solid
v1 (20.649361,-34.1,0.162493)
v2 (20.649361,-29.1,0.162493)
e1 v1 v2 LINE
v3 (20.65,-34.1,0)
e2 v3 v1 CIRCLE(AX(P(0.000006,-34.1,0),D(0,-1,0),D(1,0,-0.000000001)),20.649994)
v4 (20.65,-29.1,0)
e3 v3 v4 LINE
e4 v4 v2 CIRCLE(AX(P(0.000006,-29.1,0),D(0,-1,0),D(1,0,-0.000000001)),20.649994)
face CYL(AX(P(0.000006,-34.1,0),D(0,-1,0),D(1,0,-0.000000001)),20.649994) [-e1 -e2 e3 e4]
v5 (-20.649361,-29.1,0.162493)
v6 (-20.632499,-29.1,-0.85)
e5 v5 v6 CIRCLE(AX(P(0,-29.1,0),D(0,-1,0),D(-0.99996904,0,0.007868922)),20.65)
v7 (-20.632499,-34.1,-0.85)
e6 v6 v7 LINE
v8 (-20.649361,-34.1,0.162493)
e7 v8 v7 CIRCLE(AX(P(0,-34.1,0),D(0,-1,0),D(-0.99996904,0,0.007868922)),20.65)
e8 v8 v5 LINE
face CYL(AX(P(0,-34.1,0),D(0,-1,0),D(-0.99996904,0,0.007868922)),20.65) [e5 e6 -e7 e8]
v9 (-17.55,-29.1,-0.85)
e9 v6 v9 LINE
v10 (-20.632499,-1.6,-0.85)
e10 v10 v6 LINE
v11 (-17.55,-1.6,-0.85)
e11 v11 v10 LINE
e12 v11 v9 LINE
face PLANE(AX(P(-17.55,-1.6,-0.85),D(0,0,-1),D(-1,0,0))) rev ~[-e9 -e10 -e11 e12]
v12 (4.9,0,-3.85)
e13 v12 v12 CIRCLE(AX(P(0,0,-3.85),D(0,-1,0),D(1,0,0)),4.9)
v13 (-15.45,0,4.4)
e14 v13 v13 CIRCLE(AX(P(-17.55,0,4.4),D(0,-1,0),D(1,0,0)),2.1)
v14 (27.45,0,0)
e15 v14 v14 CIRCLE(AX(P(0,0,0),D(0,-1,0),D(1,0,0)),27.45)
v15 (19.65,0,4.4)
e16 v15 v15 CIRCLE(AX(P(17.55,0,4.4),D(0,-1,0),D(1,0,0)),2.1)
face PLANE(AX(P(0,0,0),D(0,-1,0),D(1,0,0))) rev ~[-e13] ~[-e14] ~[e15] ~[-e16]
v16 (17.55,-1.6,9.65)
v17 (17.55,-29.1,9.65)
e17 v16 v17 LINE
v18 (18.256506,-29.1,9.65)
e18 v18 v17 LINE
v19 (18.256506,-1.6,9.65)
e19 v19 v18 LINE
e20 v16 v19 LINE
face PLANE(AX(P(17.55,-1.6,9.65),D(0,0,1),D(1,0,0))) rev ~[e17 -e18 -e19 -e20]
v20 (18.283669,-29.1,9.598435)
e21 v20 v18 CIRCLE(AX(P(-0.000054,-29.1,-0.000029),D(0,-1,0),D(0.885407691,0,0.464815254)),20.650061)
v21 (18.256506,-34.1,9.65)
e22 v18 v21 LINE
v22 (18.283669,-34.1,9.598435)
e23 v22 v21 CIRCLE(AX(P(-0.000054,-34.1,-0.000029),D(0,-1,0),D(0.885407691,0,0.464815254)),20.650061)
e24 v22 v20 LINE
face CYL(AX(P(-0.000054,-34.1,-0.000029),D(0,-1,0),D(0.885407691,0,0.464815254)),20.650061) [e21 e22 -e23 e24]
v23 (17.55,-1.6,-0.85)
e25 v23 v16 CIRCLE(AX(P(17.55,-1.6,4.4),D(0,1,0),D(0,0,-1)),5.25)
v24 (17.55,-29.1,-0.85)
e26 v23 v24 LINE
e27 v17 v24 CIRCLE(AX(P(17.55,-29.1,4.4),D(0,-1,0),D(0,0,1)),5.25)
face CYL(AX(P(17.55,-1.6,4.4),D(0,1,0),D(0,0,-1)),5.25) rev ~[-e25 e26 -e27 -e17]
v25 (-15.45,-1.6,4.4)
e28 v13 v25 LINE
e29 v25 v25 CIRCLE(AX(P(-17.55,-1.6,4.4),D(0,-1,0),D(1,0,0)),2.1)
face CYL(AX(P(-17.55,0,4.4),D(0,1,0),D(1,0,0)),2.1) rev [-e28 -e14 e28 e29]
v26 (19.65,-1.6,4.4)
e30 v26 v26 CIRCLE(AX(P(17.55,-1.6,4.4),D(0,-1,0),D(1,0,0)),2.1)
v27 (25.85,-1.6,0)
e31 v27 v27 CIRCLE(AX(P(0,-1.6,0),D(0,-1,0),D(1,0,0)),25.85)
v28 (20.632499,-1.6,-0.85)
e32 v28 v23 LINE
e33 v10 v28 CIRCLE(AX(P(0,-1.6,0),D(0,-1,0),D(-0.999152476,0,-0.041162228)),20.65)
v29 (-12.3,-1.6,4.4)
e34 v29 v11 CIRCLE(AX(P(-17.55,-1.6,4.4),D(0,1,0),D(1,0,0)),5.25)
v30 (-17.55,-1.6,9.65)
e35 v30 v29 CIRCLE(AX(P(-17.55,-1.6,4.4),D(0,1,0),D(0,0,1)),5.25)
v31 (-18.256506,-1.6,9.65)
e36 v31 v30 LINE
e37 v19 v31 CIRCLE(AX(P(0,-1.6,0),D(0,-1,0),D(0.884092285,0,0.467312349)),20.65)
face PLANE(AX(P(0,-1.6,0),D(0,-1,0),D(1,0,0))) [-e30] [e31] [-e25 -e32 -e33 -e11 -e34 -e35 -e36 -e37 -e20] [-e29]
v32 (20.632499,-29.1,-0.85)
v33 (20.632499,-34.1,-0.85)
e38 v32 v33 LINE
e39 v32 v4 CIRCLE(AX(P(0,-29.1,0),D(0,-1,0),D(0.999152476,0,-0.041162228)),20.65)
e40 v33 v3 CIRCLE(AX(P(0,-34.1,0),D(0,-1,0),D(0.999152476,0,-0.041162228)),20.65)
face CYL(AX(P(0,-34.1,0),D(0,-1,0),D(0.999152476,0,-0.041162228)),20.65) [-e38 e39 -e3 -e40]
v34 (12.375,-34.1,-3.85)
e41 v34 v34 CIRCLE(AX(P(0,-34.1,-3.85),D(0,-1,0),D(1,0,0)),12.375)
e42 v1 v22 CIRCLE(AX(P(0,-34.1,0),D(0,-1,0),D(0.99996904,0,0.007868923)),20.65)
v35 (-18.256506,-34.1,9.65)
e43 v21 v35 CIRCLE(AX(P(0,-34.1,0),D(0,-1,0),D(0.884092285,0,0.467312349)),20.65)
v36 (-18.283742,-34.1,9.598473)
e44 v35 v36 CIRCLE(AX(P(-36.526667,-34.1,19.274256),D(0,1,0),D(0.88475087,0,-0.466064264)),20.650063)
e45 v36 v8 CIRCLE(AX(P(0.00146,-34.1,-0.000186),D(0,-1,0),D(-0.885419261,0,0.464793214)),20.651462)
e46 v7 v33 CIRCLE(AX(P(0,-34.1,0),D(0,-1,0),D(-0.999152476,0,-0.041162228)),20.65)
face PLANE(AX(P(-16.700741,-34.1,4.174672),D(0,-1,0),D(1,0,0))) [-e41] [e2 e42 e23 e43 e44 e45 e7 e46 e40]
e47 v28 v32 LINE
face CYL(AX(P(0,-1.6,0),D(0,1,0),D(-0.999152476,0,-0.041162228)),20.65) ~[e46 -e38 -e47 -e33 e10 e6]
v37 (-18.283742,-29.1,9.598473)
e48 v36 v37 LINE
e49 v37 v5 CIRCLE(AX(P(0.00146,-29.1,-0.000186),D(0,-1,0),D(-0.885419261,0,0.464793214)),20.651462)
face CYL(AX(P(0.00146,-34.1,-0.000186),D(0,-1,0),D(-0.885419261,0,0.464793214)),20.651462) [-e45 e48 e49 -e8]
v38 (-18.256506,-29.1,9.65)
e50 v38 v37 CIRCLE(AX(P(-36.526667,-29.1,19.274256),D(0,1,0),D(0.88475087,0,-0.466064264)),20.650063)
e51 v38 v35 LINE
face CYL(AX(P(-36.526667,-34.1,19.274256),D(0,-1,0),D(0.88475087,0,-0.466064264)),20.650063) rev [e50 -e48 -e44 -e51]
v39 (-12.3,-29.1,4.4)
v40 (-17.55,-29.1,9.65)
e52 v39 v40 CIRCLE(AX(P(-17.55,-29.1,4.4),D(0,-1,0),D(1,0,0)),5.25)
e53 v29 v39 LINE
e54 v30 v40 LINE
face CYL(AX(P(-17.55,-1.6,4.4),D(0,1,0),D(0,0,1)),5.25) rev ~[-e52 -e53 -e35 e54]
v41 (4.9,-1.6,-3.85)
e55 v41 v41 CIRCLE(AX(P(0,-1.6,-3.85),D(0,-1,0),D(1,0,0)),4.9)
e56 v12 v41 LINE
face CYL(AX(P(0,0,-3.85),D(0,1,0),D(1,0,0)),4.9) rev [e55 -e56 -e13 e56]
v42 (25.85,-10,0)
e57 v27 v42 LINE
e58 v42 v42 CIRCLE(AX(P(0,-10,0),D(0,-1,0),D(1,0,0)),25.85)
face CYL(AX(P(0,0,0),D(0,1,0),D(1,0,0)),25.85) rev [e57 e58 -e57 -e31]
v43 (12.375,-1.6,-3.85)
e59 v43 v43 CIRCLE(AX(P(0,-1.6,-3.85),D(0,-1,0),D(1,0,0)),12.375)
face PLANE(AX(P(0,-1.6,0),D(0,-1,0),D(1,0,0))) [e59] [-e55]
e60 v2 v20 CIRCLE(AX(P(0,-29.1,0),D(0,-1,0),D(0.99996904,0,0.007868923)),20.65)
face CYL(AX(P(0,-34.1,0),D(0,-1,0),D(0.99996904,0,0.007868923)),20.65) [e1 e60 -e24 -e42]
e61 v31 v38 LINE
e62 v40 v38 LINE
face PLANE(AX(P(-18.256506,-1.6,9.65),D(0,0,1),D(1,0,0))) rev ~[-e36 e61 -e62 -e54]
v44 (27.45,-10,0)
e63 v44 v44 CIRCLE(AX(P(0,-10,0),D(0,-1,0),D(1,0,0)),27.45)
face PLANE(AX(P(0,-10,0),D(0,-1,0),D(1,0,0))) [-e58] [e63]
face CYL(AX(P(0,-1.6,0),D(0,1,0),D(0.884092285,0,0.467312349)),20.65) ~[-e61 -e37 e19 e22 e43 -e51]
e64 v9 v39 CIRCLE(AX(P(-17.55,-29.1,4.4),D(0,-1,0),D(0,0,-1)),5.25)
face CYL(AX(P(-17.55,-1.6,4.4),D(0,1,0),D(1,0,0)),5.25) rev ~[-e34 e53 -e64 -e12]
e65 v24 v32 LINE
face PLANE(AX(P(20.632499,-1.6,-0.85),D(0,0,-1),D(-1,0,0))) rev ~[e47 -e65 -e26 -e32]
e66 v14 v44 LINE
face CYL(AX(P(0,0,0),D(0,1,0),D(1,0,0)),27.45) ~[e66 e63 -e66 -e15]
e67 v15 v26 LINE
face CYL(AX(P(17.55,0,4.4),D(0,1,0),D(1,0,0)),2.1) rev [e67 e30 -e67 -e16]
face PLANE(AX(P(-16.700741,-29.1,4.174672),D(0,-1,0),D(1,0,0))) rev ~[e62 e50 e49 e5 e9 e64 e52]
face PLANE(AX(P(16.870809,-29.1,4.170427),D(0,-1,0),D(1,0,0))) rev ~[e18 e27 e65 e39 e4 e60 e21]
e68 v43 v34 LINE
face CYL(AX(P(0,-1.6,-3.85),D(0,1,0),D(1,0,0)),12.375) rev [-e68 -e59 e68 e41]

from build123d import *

# Parameters (mm, degrees)
F0_R     = 25.85
F0_R_2   = 4.9
F0_R_3   = 2.1
F1_DEPTH = 1.6
F0_R_4   = 27.45
F2_DEPTH = 10
F3_R     = 12.375
F4_DEPTH = 32.5
F6_DEPTH = 5


# Not quite as in the source:
# - ends of sketch curves that miss each other by under 0.0002 mm in the source are joined


with BuildPart() as f1:
    # F0 (on Front) → F1 (new body)
    with BuildSketch(Plane.XZ):
        Circle(F0_R)
        with Locations((0, -3.85)):
            Circle(F0_R_2, mode=Mode.SUBTRACT)
        with Locations((-17.55, 4.4)):
            Circle(F0_R_3, mode=Mode.SUBTRACT)
        with Locations((17.55, 4.4)):
            Circle(F0_R_3, mode=Mode.SUBTRACT)
    extrude(amount=F1_DEPTH)

    # F0 (on Front) → F2 (join)
    with BuildSketch(Plane.XZ):
        Circle(F0_R_4)
        Circle(F0_R, mode=Mode.SUBTRACT)
    extrude(amount=F2_DEPTH)

    # F3 (on face) → F4 (join)
    with BuildSketch(Plane.XZ.offset(1.6)):
        with BuildLine():
            Line((17.55, 9.65), (18.2565056898, 9.65))
            ThreePointArc((18.2565056898, 9.65), (0, 20.65), (-18.2565056898, 9.65))
            Line((-18.2565056898, 9.65), (-17.55, 9.65))
            ThreePointArc((-17.55, 9.65), (-13.8376893988, 8.1123106012), (-12.3, 4.4))
            ThreePointArc((-12.3, 4.4), (-13.8376893988, 0.6876893988), (-17.55, -0.85))
            Line((-17.55, -0.85), (-20.6324986369, -0.85))
            ThreePointArc((-20.6324986369, -0.85), (0, -20.65), (20.6324986369, -0.85))
            Line((20.6324986369, -0.85), (17.55, -0.85))
            ThreePointArc((17.55, -0.85), (12.3, 4.4), (17.55, 9.65))
        make_face()
        with Locations((0, -3.85)):
            Circle(F3_R, mode=Mode.SUBTRACT)
    extrude(amount=F4_DEPTH)

    # F5 (on face) → F6 (join)
    with BuildSketch(Plane.XZ.offset(34.1)):
        with BuildLine():
            ThreePointArc((-17.55, -0.85), (-13.8376893988, 0.6876893988), (-12.3, 4.4))
            ThreePointArc((-12.3, 4.4), (-13.8376893988, 8.1123106012), (-17.55, 9.65))
            ThreePointArc((-17.55, 9.65), (-17.9177743439, 9.6371024462), (-18.2837416824, 9.598473155))
            ThreePointArc((-18.2837416824, 9.598473155), (-20.0300885135, 5.0217580727), (-20.6493606667, 0.1624932498))
            ThreePointArc((-20.6493606667, 0.1624932498), (-19.1802744495, -0.5904614235), (-17.55, -0.85))
        make_face()
        with BuildLine():
            ThreePointArc((-18.2837416824, 9.598473155), (-17.9177743439, 9.6371024462), (-17.55, 9.65))
            Line((-17.55, 9.65), (-18.2565056898, 9.65))
            ThreePointArc((-18.2565056898, 9.65), (-18.2701054669, 9.6242270457), (-18.2837416824, 9.598473155))
        make_face()
        with BuildLine():
            Line((-20.6324986369, -0.85), (-17.55, -0.85))
            ThreePointArc((-17.55, -0.85), (-19.1802744495, -0.5904614235), (-20.6493606667, 0.1624932498))
            ThreePointArc((-20.6493606667, 0.1624932498), (-20.6471369089, -0.3438567505), (-20.6324986369, -0.85))
        make_face()
        with BuildLine():
            ThreePointArc((20.6493606667, 0.1624932498), (20.0300885135, 5.0217580727), (18.2836688601, 9.5984349253))
            ThreePointArc((18.2836688601, 9.5984349253), (17.9177743439, 9.6371024462), (17.55, 9.65))
            ThreePointArc((17.55, 9.65), (12.3, 4.4), (17.55, -0.85))
            ThreePointArc((17.55, -0.85), (19.1802744495, -0.5904614235), (20.6493606667, 0.1624932498))
        make_face()
        with BuildLine():
            Line((17.55, -0.85), (20.6324986369, -0.85))
            ThreePointArc((20.6324986369, -0.85), (20.6456241956, -0.425090078), (20.65, 0))
            ThreePointArc((20.65, 0), (20.6498401661, 0.0812472538), (20.6493606667, 0.1624932498))
            ThreePointArc((20.6493606667, 0.1624932498), (19.1802744495, -0.5904614235), (17.55, -0.85))
        make_face()
        with BuildLine():
            ThreePointArc((18.2836688601, 9.5984349253), (18.2701054669, 9.6242270457), (18.2565056898, 9.65))
            Line((18.2565056898, 9.65), (17.55, 9.65))
            ThreePointArc((17.55, 9.65), (17.9177743439, 9.6371024462), (18.2836688601, 9.5984349253))
        make_face()
    extrude(amount=-F6_DEPTH)


solid = f1.part
